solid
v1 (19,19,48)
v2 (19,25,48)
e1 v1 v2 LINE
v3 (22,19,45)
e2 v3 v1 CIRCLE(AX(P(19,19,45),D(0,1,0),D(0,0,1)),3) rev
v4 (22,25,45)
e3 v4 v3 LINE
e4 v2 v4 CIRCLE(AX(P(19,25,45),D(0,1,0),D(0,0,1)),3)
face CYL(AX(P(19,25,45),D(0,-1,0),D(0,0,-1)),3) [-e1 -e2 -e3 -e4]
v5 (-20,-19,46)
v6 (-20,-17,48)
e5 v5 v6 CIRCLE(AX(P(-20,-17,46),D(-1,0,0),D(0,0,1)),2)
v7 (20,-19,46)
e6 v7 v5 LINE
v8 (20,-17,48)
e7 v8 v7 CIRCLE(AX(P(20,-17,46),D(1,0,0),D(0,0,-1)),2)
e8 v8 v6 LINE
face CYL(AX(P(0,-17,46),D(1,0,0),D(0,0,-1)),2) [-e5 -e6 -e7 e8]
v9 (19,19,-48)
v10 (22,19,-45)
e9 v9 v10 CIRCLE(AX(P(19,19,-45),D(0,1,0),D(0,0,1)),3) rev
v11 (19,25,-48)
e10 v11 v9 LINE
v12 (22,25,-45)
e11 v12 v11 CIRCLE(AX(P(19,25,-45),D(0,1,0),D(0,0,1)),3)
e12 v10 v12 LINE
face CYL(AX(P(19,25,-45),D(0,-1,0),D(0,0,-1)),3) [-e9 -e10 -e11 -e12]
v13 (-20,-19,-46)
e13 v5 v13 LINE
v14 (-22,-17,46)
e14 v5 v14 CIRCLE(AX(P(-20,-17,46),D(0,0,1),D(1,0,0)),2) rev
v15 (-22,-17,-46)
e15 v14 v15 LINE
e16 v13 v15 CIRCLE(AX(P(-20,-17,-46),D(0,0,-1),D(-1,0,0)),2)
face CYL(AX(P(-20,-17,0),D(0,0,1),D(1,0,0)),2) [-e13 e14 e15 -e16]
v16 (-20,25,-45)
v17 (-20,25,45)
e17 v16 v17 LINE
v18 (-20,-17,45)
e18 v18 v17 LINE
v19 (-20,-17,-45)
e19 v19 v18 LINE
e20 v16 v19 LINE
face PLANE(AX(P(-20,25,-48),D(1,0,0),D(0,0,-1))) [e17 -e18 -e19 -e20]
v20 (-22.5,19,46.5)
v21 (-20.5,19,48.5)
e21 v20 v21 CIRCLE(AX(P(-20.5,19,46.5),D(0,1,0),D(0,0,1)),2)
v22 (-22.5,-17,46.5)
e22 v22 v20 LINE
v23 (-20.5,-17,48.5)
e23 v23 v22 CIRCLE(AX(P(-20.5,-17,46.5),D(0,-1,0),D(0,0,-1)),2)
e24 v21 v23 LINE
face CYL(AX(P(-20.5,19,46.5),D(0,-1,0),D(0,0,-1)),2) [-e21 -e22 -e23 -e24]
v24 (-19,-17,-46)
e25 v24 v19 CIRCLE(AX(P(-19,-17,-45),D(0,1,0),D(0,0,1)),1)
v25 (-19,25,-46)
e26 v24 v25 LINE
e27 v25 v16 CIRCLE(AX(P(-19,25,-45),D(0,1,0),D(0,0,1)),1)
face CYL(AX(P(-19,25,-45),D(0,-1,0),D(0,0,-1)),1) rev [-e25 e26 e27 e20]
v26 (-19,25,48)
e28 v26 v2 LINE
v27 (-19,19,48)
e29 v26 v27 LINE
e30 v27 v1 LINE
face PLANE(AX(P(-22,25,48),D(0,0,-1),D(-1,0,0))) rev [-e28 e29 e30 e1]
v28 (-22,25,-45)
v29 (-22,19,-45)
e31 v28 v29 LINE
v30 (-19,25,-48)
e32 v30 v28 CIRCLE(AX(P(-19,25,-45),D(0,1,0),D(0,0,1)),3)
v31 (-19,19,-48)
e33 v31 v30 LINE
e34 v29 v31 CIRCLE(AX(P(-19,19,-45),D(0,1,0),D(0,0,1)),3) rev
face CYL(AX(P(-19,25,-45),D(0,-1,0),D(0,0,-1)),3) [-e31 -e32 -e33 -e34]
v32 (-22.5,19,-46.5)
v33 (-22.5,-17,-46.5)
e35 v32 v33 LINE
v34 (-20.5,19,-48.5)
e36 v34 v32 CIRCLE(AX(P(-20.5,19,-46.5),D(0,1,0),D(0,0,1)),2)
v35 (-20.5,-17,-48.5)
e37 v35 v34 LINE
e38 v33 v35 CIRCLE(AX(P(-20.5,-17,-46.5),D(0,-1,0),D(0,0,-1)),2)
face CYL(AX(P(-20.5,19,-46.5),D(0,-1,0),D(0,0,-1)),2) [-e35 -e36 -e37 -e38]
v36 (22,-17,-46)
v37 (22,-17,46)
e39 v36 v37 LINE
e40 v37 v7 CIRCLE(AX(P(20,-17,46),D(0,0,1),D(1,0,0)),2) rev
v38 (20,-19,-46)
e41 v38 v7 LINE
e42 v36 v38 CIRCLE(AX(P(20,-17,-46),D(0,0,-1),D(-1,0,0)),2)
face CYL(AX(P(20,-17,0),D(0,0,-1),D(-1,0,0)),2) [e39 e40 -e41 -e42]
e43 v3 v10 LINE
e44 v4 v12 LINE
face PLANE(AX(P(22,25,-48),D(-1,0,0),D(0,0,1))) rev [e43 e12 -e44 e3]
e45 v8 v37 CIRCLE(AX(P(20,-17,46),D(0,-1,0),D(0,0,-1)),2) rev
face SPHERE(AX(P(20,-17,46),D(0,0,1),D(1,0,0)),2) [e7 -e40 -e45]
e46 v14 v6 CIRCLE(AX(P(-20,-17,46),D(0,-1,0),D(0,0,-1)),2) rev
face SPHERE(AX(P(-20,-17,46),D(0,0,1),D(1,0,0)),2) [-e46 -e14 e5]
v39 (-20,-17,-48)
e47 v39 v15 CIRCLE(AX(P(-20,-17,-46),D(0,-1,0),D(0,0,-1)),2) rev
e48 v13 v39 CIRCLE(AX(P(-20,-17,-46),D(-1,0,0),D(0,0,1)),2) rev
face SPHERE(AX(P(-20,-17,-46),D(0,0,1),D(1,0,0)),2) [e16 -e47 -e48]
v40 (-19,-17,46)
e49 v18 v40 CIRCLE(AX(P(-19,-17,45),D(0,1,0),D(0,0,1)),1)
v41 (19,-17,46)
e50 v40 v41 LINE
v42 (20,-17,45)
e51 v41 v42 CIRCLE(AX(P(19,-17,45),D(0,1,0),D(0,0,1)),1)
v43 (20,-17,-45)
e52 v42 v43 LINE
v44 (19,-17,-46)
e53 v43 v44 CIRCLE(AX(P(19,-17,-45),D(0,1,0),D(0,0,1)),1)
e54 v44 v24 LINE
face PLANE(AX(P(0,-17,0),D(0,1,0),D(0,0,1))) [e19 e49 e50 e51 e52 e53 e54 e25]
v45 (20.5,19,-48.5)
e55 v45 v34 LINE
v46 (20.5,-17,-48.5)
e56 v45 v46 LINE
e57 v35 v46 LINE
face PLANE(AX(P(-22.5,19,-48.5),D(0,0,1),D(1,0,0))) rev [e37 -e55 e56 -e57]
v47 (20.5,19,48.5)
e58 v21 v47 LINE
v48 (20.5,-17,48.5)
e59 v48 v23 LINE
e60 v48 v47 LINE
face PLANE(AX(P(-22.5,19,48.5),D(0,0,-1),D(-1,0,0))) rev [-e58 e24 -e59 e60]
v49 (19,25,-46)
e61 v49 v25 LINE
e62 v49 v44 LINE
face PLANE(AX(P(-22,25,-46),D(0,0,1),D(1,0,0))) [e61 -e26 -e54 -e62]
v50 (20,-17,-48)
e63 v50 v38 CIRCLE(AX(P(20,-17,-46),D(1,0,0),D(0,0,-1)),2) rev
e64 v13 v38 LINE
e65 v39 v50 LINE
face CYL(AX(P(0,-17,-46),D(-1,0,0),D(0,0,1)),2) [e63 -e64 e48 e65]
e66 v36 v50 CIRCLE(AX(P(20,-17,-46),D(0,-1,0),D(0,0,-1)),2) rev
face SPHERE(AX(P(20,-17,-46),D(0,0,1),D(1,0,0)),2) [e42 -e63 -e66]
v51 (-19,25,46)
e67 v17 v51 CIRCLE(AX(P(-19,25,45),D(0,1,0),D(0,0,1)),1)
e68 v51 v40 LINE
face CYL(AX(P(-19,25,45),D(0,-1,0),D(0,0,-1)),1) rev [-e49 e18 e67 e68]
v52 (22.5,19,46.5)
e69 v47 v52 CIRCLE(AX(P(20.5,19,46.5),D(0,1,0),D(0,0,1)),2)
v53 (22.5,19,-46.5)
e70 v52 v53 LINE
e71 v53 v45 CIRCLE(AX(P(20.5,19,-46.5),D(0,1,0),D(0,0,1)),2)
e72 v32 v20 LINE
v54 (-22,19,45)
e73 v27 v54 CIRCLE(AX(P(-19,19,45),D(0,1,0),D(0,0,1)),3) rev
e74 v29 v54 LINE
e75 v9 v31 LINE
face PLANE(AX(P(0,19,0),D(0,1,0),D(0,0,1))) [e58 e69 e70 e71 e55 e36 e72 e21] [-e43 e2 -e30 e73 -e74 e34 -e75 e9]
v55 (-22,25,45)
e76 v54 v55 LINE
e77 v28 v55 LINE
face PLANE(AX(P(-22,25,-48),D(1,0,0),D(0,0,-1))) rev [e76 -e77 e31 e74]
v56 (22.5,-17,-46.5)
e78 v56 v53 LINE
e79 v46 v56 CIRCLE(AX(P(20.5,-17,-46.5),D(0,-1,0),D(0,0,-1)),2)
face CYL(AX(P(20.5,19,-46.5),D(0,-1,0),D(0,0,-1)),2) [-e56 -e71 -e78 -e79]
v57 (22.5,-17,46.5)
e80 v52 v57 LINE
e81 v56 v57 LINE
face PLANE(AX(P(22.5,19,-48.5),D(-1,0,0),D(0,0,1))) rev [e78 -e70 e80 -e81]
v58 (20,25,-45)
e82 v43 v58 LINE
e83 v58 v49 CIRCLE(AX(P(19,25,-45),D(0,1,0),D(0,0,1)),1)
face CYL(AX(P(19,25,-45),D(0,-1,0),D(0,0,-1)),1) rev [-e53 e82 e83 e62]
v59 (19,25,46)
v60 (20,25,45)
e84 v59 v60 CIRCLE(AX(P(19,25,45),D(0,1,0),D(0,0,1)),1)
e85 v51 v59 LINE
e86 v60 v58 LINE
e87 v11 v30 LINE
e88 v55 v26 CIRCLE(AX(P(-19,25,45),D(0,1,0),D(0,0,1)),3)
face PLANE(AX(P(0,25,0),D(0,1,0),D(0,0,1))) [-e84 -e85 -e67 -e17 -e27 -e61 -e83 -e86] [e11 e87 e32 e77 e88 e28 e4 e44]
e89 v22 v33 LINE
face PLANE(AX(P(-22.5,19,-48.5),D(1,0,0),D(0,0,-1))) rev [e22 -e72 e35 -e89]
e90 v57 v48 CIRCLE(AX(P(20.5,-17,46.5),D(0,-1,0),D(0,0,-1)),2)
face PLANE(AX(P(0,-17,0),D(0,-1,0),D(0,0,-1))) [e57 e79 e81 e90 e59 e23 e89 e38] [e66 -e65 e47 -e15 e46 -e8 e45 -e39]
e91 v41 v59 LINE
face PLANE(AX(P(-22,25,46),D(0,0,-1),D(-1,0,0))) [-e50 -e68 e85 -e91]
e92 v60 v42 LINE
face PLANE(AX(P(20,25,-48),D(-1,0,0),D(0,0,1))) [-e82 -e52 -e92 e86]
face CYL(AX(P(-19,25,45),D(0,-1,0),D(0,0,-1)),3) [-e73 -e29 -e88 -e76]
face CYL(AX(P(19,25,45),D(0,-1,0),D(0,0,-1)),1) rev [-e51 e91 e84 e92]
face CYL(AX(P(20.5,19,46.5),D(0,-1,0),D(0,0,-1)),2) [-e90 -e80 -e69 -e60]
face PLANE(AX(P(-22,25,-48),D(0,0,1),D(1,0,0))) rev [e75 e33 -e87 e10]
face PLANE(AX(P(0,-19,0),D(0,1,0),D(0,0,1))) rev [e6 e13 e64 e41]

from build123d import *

# Parameters (mm, degrees)
SKETCH1_W           = 45
SKETCH1_H           = 97
BOSS_EXTRUDE1_DEPTH = 19
SKETCH2_W           = 44
SKETCH2_H           = 96
BOSS_EXTRUDE2_DEPTH = 6
SKETCH3_W           = 45
SKETCH3_H           = 97
SKETCH3_W_2         = 44
SKETCH3_H_2         = 96
CUT_EXTRUDE1_DEPTH  = 2
FILLET1_R           = 2
FILLET4_R           = 3
FILLET5_R           = 2
SHELL2_START        = -17
SHELL2_DEPTH        = 42
SHELL2_2_OUTLINE_W  = 41
SHELL2_2_OUTLINE_H  = 93
SHELL2_2_DEPTH      = 34
BOSS_EXTRUDE3_START = 34
SKETCH4_W           = 41
SKETCH4_H           = 93
BOSS_EXTRUDE3_DEPTH = 34


# Read off the part's stored shape, not the designer's step: Shell2
with BuildPart() as part:
    # Sketch1 → Boss-Extrude1 (new, symmetric)
    with BuildSketch(Plane(origin=(0, 0, 0), x_dir=(1, 0, 0), z_dir=(0, 1, 0))):
        Rectangle(SKETCH1_W, SKETCH1_H)
    extrude(amount=BOSS_EXTRUDE1_DEPTH, both=True)

    # Sketch2 → Boss-Extrude2 (add)
    with BuildSketch(Plane(origin=(0, 19, 0), x_dir=(1, 0, 0), z_dir=(0, 1, 0))):
        Rectangle(SKETCH2_W, SKETCH2_H)
    extrude(amount=BOSS_EXTRUDE2_DEPTH)

    # Sketch3 → Cut-Extrude1 (cut)
    with BuildSketch(Plane.XZ.offset(19)):
        Rectangle(SKETCH3_W, SKETCH3_H)
        Rectangle(SKETCH3_W_2, SKETCH3_H_2, mode=Mode.SUBTRACT)
    extrude(amount=-CUT_EXTRUDE1_DEPTH, mode=Mode.SUBTRACT)

    # Fillet1
    fillet1_edges = [part.edges().sort_by_distance(p)[0] for p in [
        (22, -19, 0),
        (22, -18, -48),
        (0, -19, -48),
        (-22, -18, -48),
        (-22, -19, 0),
        (-22, -18, 48),
        (0, -19, 48),
        (22, -18, 48),
    ]]
    fillet(fillet1_edges, radius=FILLET1_R - 0.0001)  # a hair under: the kernel refuses the full size

    # Fillet4
    fillet4_edges = [part.edges().sort_by_distance(p)[0] for p in [
        (22, 22, 48),
        (22, 22, -48),
        (-22, 22, -48),
        (-22, 22, 48),
    ]]
    fillet(fillet4_edges, radius=FILLET4_R)

    # Fillet5
    fillet5_edges = [part.edges().sort_by_distance(p)[0] for p in [
        (22.5, 1, 48.5),
        (-22.5, 1, 48.5),
        (-22.5, 1, -48.5),
        (22.5, 1, -48.5),
    ]]
    fillet(fillet5_edges, radius=FILLET5_R)

    # Shell2 outline → Shell2 (cut)
    with BuildSketch(Plane(origin=(0, 0, 0), x_dir=(1, 0, 0), z_dir=(0, 1, 0)).offset(SHELL2_START)):
        with BuildLine():
            Line((20, -45), (20, 45))
            ThreePointArc((20, 45), (19.707106781, 45.707106781), (19, 46))
            Line((19, 46), (-19, 46))
            ThreePointArc((-19, 46), (-19.707106781, 45.707106781), (-20, 45))
            Line((-20, 45), (-20, -45))
            ThreePointArc((-20, -45), (-19.707106781, -45.707106781), (-19, -46))
            Line((-19, -46), (19, -46))
            ThreePointArc((19, -46), (19.707106781, -45.707106781), (20, -45))
        make_face()
    extrude(amount=SHELL2_DEPTH, mode=Mode.SUBTRACT)

    # Shell2 2 outline → Shell2 2 (cut)
    with BuildSketch(Plane(origin=(0, 0, 0), x_dir=(1, 0, 0), z_dir=(0, 1, 0)).offset(SHELL2_START)):
        Rectangle(SHELL2_2_OUTLINE_W, SHELL2_2_OUTLINE_H)
        with BuildLine():
            ThreePointArc((19, 46), (19.707106781, 45.707106781), (20, 45))
            Line((20, 45), (20, -45))
            ThreePointArc((20, -45), (19.707106781, -45.707106781), (19, -46))
            Line((19, -46), (-19, -46))
            ThreePointArc((-19, -46), (-19.707106781, -45.707106781), (-20, -45))
            Line((-20, -45), (-20, 45))
            ThreePointArc((-20, 45), (-19.707106781, 45.707106781), (-19, 46))
            Line((-19, 46), (19, 46))
        make_face(mode=Mode.SUBTRACT)
    extrude(amount=SHELL2_2_DEPTH, mode=Mode.SUBTRACT)

    # Sketch4 → Boss-Extrude3 (add)
    with BuildSketch(Plane.XZ.offset(-17).offset(BOSS_EXTRUDE3_START)):
        Rectangle(SKETCH4_W, SKETCH4_H)
        with BuildLine():
            Line((19, -46), (-19, -46))
            ThreePointArc((-19, -46), (-19.707106781, -45.707106781), (-20, -45))
            Line((-20, -45), (-20, 45))
            ThreePointArc((-20, 45), (-19.707106781, 45.707106781), (-19, 46))
            Line((-19, 46), (19, 46))
            ThreePointArc((19, 46), (19.707106781, 45.707106781), (20, 45))
            Line((20, 45), (20, -45))
            ThreePointArc((20, -45), (19.707106781, -45.707106781), (19, -46))
        make_face(mode=Mode.SUBTRACT)
    extrude(amount=-BOSS_EXTRUDE3_DEPTH)


solid = part.part
